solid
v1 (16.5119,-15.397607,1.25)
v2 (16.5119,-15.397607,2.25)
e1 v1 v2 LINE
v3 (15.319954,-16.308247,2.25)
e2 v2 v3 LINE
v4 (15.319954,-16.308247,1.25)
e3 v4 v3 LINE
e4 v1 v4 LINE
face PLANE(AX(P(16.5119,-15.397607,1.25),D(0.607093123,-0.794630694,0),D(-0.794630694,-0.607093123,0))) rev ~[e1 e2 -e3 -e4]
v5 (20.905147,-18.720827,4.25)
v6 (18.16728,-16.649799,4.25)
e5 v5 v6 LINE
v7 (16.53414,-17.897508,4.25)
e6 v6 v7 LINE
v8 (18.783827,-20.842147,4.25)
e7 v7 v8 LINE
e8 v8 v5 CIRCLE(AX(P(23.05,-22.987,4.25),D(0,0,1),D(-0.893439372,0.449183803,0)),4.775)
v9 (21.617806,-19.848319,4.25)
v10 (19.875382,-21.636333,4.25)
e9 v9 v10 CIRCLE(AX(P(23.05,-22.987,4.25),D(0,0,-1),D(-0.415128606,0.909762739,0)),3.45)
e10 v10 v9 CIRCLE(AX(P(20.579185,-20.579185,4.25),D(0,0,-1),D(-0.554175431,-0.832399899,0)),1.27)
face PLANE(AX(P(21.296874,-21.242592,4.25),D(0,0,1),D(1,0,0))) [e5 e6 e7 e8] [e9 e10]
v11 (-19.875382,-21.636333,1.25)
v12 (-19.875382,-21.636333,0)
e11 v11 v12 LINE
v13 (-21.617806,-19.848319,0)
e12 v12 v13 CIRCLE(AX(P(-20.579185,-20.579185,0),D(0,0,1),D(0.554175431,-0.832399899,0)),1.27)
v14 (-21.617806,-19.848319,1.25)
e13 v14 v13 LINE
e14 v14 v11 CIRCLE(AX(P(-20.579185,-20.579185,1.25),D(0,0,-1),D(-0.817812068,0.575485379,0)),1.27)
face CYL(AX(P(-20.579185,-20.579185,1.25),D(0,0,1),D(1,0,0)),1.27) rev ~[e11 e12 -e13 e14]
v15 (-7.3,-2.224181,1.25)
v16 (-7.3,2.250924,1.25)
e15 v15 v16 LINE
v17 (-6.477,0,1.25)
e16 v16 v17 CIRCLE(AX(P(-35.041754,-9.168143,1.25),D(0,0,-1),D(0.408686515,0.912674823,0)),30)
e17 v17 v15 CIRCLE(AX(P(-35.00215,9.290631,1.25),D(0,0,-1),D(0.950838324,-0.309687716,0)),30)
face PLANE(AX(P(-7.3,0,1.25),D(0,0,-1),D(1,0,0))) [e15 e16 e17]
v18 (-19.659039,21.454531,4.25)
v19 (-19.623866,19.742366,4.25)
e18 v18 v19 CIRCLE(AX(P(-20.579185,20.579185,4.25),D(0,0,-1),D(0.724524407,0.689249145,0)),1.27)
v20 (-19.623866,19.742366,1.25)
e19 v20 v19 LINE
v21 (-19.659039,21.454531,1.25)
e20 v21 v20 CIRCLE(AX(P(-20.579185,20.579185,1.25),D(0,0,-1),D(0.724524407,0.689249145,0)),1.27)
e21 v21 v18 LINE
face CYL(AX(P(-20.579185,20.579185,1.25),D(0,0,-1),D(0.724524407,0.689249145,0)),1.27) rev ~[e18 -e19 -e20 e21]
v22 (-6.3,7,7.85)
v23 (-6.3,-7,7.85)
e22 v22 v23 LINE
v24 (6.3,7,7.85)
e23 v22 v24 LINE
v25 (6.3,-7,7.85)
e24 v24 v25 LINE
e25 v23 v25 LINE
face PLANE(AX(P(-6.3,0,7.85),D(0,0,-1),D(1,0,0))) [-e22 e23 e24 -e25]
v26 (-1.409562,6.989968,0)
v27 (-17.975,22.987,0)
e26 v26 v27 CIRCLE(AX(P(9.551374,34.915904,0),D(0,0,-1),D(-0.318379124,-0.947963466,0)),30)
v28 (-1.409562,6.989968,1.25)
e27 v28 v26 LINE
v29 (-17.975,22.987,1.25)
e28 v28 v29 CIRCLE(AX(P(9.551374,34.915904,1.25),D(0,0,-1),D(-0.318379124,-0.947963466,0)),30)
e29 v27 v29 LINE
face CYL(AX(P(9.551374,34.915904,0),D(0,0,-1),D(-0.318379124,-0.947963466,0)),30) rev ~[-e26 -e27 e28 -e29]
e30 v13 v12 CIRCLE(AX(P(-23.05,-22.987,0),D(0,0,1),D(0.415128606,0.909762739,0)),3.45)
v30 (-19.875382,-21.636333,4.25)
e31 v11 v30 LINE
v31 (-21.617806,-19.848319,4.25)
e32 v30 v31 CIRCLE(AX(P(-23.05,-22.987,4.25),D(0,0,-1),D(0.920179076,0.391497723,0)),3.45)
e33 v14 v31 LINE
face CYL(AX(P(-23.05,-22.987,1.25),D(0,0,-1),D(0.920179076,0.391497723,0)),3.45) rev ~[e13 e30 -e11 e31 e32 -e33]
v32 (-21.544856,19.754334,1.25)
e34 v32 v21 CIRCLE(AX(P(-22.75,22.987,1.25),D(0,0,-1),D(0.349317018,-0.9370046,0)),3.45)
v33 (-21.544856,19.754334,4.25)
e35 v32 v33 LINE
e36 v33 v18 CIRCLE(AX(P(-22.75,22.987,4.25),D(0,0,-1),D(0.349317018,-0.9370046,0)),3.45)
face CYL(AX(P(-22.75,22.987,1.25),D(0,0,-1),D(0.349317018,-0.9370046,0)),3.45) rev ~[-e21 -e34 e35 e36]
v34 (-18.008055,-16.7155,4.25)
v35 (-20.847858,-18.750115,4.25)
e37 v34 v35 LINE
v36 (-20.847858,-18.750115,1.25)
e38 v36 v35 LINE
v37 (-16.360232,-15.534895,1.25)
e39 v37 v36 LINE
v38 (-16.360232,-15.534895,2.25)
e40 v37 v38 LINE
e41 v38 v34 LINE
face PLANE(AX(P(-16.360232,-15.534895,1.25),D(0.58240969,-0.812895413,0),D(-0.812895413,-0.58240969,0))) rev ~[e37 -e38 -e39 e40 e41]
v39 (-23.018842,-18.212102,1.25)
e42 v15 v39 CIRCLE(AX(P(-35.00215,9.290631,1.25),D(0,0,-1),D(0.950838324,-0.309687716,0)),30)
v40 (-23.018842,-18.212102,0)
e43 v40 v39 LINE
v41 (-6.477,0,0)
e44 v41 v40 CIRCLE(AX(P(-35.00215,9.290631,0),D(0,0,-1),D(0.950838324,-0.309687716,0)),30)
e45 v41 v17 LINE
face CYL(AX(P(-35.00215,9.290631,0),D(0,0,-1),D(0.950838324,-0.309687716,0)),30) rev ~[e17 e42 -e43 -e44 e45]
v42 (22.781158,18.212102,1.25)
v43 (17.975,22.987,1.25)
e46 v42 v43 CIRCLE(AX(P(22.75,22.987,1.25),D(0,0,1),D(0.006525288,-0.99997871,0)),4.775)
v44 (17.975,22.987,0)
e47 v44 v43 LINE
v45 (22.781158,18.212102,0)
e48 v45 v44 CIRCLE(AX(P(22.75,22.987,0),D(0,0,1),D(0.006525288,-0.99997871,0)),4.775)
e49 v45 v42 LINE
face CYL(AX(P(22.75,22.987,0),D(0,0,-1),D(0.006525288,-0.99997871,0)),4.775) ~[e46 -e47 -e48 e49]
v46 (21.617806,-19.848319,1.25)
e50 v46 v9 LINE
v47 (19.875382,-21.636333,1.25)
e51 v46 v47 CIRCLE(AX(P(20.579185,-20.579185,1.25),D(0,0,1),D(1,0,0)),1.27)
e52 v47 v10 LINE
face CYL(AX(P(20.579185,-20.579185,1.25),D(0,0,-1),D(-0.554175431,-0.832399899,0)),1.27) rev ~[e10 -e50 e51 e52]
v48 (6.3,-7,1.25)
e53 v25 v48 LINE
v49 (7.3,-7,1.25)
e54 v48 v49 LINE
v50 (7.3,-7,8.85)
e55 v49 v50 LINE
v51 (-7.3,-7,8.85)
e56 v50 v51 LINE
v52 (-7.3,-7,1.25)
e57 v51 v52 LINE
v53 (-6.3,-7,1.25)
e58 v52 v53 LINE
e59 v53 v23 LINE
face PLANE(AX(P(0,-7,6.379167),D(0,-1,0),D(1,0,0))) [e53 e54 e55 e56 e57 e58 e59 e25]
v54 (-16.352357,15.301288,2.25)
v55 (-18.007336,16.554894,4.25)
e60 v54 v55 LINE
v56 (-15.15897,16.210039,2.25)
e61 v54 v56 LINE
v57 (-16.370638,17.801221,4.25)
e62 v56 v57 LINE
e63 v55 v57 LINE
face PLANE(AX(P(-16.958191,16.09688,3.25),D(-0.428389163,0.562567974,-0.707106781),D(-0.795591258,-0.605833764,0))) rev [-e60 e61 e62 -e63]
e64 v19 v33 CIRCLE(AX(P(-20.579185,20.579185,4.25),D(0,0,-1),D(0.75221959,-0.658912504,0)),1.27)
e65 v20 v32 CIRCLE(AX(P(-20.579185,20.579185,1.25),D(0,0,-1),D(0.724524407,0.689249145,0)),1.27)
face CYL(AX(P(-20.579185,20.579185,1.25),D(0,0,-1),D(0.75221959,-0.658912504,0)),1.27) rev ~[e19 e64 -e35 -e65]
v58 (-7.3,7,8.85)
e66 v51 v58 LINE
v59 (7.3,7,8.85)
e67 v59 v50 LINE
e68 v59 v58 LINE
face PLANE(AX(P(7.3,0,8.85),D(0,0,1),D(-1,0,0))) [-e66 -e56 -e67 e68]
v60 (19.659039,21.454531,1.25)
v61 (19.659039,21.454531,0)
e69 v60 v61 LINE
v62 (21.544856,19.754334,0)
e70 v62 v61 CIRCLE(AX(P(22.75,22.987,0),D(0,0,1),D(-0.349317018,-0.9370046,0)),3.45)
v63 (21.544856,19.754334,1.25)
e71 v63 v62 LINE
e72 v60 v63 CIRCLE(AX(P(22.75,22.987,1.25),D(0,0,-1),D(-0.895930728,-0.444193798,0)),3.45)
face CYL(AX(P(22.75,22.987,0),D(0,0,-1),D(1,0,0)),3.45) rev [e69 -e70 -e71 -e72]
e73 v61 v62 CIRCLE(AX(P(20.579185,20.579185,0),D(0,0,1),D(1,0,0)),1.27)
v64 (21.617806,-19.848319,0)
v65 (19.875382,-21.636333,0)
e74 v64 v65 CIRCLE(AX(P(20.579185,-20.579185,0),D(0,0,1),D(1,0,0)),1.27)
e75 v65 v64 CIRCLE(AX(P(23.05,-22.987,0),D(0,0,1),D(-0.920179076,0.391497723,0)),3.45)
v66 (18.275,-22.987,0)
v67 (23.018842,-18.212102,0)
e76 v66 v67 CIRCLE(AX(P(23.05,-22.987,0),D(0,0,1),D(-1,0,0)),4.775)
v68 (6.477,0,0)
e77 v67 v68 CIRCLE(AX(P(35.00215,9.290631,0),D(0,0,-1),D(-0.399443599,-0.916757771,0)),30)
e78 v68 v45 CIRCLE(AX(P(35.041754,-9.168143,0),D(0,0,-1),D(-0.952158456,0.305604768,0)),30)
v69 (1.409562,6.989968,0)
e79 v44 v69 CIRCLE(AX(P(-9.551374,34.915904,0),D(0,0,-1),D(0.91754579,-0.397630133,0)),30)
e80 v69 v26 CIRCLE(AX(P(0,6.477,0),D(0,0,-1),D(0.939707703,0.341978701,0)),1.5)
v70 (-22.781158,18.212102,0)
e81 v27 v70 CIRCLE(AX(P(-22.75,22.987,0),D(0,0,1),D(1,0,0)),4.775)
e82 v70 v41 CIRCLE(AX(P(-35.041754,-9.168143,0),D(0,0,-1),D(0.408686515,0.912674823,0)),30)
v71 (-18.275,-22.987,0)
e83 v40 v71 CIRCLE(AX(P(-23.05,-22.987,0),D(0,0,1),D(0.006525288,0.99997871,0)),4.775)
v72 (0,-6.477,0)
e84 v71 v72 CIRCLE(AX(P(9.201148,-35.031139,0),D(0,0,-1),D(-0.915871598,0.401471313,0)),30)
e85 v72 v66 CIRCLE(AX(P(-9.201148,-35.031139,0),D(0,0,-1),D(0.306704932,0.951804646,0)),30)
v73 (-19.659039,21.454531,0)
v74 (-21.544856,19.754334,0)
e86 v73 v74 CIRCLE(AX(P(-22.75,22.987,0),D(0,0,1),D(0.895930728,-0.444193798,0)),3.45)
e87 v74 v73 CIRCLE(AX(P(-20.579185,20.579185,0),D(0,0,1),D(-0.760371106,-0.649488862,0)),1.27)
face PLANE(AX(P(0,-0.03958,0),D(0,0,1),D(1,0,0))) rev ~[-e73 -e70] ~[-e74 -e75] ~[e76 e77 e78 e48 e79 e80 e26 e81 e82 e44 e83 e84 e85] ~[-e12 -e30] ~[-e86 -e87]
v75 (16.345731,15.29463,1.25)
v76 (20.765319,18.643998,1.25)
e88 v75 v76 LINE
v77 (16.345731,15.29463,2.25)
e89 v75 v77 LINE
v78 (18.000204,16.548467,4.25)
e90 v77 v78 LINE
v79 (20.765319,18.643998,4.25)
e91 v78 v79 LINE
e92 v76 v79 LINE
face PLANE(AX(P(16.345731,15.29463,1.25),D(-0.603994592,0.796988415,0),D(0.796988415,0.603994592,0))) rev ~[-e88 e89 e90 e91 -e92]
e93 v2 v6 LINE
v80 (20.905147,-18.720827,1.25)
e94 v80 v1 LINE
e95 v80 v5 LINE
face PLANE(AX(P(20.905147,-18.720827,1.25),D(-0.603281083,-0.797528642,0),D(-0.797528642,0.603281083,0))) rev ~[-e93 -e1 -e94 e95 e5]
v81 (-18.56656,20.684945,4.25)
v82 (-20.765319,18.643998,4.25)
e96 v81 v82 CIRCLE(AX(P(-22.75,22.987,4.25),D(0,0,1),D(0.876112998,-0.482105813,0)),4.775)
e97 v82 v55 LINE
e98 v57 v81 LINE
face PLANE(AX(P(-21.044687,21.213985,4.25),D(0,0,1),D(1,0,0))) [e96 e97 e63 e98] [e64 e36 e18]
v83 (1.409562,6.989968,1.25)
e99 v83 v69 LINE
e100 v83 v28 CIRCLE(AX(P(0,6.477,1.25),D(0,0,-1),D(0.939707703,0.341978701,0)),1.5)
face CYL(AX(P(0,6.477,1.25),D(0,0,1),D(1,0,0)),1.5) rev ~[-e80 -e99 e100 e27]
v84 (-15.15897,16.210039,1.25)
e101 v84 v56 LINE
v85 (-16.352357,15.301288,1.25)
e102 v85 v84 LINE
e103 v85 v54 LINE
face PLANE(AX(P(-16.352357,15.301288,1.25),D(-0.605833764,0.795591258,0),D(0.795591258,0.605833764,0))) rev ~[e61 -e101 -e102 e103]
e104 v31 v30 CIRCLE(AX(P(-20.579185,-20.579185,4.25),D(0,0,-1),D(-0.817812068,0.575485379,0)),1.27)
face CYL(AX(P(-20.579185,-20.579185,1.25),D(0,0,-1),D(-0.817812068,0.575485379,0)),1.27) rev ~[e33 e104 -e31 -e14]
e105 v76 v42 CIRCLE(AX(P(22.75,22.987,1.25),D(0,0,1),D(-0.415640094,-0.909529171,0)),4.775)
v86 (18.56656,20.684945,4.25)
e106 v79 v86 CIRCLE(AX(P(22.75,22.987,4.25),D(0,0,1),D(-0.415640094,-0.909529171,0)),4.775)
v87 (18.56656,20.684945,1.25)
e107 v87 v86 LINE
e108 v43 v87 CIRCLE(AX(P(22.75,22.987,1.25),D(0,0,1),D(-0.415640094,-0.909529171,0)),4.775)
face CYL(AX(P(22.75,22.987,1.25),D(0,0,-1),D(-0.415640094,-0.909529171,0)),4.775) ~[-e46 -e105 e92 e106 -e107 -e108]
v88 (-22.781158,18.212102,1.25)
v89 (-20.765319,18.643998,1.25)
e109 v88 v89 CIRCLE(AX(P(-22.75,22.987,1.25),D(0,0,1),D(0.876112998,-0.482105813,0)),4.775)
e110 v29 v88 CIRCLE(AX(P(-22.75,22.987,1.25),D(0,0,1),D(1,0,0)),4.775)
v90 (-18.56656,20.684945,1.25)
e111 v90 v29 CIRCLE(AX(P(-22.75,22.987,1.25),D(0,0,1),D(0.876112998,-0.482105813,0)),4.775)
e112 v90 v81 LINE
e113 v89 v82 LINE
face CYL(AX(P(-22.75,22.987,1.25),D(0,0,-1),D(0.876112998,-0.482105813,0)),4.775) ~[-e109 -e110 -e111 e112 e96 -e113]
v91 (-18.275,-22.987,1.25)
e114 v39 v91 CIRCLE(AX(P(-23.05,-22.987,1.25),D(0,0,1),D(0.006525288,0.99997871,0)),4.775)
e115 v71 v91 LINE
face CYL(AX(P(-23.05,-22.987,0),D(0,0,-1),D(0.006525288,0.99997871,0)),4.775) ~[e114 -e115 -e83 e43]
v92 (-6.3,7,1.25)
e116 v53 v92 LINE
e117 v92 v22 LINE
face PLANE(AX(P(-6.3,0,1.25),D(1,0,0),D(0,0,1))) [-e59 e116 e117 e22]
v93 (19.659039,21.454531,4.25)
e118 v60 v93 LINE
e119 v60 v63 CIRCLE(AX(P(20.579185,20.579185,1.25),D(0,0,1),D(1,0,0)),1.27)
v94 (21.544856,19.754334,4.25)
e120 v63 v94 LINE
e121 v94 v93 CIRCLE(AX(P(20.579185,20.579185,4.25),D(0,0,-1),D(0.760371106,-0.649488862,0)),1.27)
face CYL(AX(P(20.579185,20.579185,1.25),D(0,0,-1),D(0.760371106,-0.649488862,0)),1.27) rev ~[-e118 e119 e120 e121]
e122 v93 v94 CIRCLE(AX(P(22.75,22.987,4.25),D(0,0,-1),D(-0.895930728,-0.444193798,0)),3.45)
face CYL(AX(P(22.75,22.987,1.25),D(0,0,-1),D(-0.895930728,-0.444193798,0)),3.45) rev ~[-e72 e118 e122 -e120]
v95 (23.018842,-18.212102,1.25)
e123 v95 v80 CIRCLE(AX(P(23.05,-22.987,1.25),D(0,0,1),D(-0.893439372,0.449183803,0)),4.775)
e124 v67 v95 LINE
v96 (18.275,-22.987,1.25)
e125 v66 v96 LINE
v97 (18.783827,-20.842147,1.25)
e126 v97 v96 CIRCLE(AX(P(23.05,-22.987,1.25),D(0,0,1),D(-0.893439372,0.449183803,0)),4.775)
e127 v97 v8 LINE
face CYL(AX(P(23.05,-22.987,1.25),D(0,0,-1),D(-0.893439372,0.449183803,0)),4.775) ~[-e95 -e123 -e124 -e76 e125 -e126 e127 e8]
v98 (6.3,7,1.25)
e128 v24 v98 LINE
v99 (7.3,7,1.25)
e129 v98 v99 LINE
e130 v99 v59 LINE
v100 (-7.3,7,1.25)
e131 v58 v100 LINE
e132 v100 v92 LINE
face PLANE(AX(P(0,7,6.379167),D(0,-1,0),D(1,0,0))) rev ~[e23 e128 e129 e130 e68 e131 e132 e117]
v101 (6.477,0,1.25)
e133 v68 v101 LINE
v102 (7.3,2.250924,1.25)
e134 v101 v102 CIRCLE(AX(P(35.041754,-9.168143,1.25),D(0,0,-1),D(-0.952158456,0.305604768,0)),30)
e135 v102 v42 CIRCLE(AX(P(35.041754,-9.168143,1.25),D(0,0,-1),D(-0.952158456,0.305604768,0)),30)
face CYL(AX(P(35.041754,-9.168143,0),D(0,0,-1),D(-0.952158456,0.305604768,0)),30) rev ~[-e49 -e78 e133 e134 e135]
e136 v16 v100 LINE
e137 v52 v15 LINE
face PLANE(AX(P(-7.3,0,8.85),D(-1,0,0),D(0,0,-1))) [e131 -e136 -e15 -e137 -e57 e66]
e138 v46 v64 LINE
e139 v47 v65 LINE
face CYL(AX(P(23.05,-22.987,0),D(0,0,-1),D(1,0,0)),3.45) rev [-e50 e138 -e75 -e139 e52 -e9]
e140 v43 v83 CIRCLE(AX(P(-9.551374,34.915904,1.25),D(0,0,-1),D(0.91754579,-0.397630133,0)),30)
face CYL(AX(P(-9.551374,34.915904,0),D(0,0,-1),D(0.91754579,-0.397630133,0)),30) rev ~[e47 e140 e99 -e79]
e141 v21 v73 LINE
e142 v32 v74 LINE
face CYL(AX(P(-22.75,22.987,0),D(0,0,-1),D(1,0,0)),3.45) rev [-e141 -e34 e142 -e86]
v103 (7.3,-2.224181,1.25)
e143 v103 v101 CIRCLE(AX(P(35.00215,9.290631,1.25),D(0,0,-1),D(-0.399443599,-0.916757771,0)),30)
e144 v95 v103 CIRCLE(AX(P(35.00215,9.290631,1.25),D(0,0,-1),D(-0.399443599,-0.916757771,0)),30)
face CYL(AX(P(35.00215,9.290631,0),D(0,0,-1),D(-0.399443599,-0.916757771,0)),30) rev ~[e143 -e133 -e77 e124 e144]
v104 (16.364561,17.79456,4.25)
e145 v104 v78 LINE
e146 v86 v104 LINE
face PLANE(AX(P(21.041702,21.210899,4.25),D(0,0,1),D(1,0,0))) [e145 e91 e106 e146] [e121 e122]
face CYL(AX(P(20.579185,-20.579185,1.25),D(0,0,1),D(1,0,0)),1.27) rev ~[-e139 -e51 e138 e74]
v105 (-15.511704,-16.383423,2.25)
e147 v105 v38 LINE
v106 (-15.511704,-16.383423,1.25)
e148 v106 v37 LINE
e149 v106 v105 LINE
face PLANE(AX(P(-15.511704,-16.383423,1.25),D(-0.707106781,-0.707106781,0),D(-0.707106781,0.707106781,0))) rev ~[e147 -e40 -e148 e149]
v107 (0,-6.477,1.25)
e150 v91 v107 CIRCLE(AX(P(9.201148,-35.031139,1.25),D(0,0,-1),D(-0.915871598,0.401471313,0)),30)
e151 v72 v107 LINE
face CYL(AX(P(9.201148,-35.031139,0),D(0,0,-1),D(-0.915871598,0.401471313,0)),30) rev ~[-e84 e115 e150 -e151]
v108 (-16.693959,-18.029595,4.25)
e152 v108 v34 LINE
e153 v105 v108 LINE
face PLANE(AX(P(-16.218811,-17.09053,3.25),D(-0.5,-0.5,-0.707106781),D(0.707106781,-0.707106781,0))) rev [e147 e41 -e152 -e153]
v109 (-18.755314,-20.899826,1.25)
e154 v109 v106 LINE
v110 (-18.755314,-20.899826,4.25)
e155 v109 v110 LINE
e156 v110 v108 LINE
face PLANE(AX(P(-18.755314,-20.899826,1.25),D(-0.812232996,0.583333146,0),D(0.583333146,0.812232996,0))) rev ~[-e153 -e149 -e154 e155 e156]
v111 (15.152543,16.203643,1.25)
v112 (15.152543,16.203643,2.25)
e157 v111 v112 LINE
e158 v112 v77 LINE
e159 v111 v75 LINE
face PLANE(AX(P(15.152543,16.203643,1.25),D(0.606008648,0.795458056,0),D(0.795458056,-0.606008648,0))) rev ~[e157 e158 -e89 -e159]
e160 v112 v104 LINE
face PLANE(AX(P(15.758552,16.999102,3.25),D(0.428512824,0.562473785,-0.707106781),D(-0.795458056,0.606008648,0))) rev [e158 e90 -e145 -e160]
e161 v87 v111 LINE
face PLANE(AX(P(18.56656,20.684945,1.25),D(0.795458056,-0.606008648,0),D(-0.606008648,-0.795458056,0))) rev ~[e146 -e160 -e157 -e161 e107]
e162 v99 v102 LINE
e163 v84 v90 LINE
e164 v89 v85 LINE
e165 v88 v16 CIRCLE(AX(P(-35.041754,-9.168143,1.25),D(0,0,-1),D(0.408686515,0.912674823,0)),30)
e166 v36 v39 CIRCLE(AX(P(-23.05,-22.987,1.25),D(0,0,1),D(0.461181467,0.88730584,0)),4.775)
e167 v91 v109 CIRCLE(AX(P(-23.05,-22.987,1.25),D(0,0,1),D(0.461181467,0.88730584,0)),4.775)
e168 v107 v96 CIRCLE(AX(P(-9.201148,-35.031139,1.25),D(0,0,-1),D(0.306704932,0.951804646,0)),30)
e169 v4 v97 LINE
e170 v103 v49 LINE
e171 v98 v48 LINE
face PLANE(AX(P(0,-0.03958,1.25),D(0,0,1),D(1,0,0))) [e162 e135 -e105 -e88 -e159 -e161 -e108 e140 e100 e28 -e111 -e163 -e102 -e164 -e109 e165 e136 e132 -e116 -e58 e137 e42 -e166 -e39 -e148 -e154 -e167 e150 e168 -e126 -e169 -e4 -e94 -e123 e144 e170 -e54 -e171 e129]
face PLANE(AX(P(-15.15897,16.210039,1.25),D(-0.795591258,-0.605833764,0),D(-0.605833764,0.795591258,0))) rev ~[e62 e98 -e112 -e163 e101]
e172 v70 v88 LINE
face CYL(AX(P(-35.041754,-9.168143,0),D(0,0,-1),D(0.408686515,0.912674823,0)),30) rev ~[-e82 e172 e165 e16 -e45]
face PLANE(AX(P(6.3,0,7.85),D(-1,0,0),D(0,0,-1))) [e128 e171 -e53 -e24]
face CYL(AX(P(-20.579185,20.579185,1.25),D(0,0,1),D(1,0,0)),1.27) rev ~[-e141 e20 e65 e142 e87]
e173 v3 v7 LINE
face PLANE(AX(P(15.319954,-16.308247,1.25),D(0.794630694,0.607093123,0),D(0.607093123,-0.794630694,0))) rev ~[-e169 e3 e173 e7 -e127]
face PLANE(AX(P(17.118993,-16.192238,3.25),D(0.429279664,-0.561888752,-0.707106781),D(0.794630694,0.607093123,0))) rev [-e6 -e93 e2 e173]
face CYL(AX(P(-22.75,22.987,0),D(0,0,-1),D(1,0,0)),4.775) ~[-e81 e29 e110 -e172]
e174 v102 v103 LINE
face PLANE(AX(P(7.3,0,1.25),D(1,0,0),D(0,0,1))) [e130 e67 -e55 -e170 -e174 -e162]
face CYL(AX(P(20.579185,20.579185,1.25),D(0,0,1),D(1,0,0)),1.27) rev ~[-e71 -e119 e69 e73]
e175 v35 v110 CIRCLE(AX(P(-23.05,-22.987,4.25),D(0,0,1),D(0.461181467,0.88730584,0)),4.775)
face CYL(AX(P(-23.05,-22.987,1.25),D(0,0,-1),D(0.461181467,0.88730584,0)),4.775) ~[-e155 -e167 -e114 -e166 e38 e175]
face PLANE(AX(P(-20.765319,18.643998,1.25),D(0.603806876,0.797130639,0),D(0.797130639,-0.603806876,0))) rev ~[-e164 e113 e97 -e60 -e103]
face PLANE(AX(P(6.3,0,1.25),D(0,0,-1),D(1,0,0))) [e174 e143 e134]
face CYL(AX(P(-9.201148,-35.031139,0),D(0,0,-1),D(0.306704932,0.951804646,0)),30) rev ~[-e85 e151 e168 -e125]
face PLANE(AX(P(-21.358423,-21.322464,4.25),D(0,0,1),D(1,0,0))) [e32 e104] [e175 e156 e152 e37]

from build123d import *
from build123d import SkipClean  # not in build123d's __all__

# Parameters (mm, degrees)
F0_R     = 3.45
F1_DEPTH = 1.25
F2_R     = 1.27
F3_DEPTH = 15.24
F5_DEPTH = 7
F6_R     = 1.5
F7_DEPTH = 1.25
F9_DEPTH = 3
F10_SIZE = 2


# Not quite as in the source:
# - a feature of the source that left no trace in its solid (it failed there, or was rolled back) is left out


with BuildPart() as f1:
    # F0 (on Top) → F1 (new body)
    with BuildSketch(Plane.XY):
        with BuildLine():
            ThreePointArc((0, 6.477), (-10.7423411653, 12.8214445823), (-17.975, 22.987))
            ThreePointArc((-17.975, 22.987), (-26.1154007446, 26.3744330736), (-22.7811582525, 18.2121016594))
            ThreePointArc((-22.7811582525, 18.2121016594), (-12.6900771407, 10.8419183213), (-6.477, 0))
            ThreePointArc((-6.477, 0), (-12.7950799481, -10.8797937043), (-23.0188417475, -18.2121016594))
            ThreePointArc((-23.0188417475, -18.2121016594), (-26.4374330736, -26.3524007446), (-18.275, -22.987))
            ThreePointArc((-18.275, -22.987), (-10.9098200432, -12.770210249), (0, -6.477))
            ThreePointArc((0, -6.477), (10.9098200432, -12.770210249), (18.275, -22.987))
            ThreePointArc((18.275, -22.987), (26.4374330736, -26.3524007446), (23.0188417475, -18.2121016594))
            ThreePointArc((23.0188417475, -18.2121016594), (12.7950799481, -10.8797937043), (6.477, 0))
            ThreePointArc((6.477, 0), (12.6900771407, 10.8419183213), (22.7811582525, 18.2121016594))
            ThreePointArc((22.7811582525, 18.2121016594), (26.1154007446, 26.3744330736), (17.975, 22.987))
            ThreePointArc((17.975, 22.987), (10.7423411653, 12.8214445823), (0, 6.477))
        make_face()
        with Locations((-23.05, -22.987)):
            Circle(F0_R, mode=Mode.SUBTRACT)
        with Locations((23.05, -22.987)):
            Circle(F0_R, mode=Mode.SUBTRACT)
        with Locations((-22.75, 22.987)):
            Circle(F0_R, mode=Mode.SUBTRACT)
        with Locations((22.75, 22.987)):
            Circle(F0_R, mode=Mode.SUBTRACT)
    extrude(amount=F1_DEPTH)

    # F2 (on face) → F3 (cut)
    with BuildSketch(Plane.XY.offset(1.25)):
        with Locations((-20.5791849834, 20.5791849834)):
            Circle(F2_R)
        with Locations((20.5791849834, 20.5791849834)):
            Circle(F2_R)
        with Locations((20.5791849834, -20.5791849834)):
            Circle(F2_R)
        with Locations((-20.5791849834, -20.5791849834)):
            Circle(F2_R)
    extrude(amount=-F3_DEPTH, mode=Mode.SUBTRACT)

    # F4 (on Front) → F5 (join, symmetric)
    with BuildSketch(Plane.XZ):
        Polygon((-6.3, 1.25), (-6.3, 7.85), (6.3, 7.85), (6.3, 1.25), (7.3, 1.25), (7.3, 8.85), (-7.3, 8.85), (-7.3, 1.25), align=None)
    extrude(amount=F5_DEPTH, both=True)

    # F6 (on face) → F7 (cut, through all)
    with BuildSketch(Plane.XY.offset(1.25)):
        with Locations((0, 6.477)):
            Circle(F6_R)
    extrude(amount=-F7_DEPTH, mode=Mode.SUBTRACT)

    # F8 (on face) → F9 (join)
    with BuildSketch(Plane.XY.offset(1.25)):
        with BuildLine():
            Line((-16.3602319323, -15.5348950992), (-20.8478584952, -18.7501146118))
            ThreePointArc((-20.8478584952, -18.7501146118), (-26.4716233511, -26.3176333696), (-18.7553139698, -20.8998256177))
            Line((-18.7553139698, -20.8998256177), (-15.5117037948, -16.3834232366))
            Line((-15.5117037948, -16.3834232366), (-16.3602319323, -15.5348950992))
        make_face()
        with BuildLine():
            ThreePointArc((-19.8753821862, -21.6363328551), (-25.5208150166, -25.3948150166), (-21.6178063096, -19.8483185518))
            ThreePointArc((-21.6178063096, -19.8483185518), (-19.669638586, -19.6928298904), (-19.8753821862, -21.6363328551))
        make_face(mode=Mode.SUBTRACT)
        with BuildLine():
            Line((15.3199540065, -16.3082468694), (18.7838269987, -20.8421473423))
            ThreePointArc((18.7838269987, -20.8421473423), (26.4264348802, -26.3634348802), (20.9051473423, -18.7208269987))
            Line((20.9051473423, -18.7208269987), (16.5119000472, -15.3976071843))
            Line((16.5119000472, -15.3976071843), (15.3199540065, -16.3082468694))
        make_face()
        with BuildLine():
            ThreePointArc((21.6178063096, -19.8483185518), (25.5208150166, -25.3948150166), (19.8753821862, -21.6363328551))
            ThreePointArc((19.8753821862, -21.6363328551), (19.669638586, -19.6928298904), (21.6178063096, -19.8483185518))
        make_face(mode=Mode.SUBTRACT)
        with BuildLine():
            Line((16.3457305073, 15.2946304795), (20.7653185529, 18.6439982094))
            ThreePointArc((20.7653185529, 18.6439982094), (25.9985065626, 26.4866900024), (18.5665604362, 20.6849447408))
            Line((18.5665604362, 20.6849447408), (15.1525434236, 16.2036434514))
            Line((15.1525434236, 16.2036434514), (16.3457305073, 15.2946304795))
        make_face()
        with BuildLine():
            ThreePointArc((19.659038987, 21.4545313979), (25.0601507831, 25.5493628469), (21.5448562878, 19.7543341291))
            ThreePointArc((21.5448562878, 19.7543341291), (19.7287816517, 19.6359383702), (19.659038987, 21.4545313979))
        make_face(mode=Mode.SUBTRACT)
        with BuildLine():
            ThreePointArc((-18.5665604362, 20.6849447408), (-25.9985065626, 26.4866900024), (-20.7653185529, 18.6439982094))
            Line((-20.7653185529, 18.6439982094), (-16.3523570468, 15.30128828))
            Line((-16.3523570468, 15.30128828), (-15.1589701598, 16.2100389266))
            Line((-15.1589701598, 16.2100389266), (-18.5665604362, 20.6849447408))
        make_face()
        with BuildLine():
            ThreePointArc((-21.5448562878, 19.7543341291), (-25.0601507831, 25.5493628469), (-19.659038987, 21.4545313979))
            ThreePointArc((-19.659038987, 21.4545313979), (-19.3094528761, 20.6052689951), (-19.6238661036, 19.7423661036))
            ThreePointArc((-19.6238661036, 19.7423661036), (-20.5870970996, 19.30920963), (-21.5448562878, 19.7543341291))
        make_face(mode=Mode.SUBTRACT)
    with SkipClean():  # cleaning this boolean's faces spoils the solid; the shape is the same uncleaned
        extrude(amount=F9_DEPTH)

    # F10
    f10_edges = [f1.edges().sort_by_distance(p)[0] for p in [
        (-15.755664, 15.755664, 4.25),
        (-15.935968, -15.959159, 4.25),
        (15.915927, -15.852927, 4.25),
        (15.749137, 15.749137, 4.25),
    ]]
    chamfer(f10_edges, length=F10_SIZE)


solid = f1.part
